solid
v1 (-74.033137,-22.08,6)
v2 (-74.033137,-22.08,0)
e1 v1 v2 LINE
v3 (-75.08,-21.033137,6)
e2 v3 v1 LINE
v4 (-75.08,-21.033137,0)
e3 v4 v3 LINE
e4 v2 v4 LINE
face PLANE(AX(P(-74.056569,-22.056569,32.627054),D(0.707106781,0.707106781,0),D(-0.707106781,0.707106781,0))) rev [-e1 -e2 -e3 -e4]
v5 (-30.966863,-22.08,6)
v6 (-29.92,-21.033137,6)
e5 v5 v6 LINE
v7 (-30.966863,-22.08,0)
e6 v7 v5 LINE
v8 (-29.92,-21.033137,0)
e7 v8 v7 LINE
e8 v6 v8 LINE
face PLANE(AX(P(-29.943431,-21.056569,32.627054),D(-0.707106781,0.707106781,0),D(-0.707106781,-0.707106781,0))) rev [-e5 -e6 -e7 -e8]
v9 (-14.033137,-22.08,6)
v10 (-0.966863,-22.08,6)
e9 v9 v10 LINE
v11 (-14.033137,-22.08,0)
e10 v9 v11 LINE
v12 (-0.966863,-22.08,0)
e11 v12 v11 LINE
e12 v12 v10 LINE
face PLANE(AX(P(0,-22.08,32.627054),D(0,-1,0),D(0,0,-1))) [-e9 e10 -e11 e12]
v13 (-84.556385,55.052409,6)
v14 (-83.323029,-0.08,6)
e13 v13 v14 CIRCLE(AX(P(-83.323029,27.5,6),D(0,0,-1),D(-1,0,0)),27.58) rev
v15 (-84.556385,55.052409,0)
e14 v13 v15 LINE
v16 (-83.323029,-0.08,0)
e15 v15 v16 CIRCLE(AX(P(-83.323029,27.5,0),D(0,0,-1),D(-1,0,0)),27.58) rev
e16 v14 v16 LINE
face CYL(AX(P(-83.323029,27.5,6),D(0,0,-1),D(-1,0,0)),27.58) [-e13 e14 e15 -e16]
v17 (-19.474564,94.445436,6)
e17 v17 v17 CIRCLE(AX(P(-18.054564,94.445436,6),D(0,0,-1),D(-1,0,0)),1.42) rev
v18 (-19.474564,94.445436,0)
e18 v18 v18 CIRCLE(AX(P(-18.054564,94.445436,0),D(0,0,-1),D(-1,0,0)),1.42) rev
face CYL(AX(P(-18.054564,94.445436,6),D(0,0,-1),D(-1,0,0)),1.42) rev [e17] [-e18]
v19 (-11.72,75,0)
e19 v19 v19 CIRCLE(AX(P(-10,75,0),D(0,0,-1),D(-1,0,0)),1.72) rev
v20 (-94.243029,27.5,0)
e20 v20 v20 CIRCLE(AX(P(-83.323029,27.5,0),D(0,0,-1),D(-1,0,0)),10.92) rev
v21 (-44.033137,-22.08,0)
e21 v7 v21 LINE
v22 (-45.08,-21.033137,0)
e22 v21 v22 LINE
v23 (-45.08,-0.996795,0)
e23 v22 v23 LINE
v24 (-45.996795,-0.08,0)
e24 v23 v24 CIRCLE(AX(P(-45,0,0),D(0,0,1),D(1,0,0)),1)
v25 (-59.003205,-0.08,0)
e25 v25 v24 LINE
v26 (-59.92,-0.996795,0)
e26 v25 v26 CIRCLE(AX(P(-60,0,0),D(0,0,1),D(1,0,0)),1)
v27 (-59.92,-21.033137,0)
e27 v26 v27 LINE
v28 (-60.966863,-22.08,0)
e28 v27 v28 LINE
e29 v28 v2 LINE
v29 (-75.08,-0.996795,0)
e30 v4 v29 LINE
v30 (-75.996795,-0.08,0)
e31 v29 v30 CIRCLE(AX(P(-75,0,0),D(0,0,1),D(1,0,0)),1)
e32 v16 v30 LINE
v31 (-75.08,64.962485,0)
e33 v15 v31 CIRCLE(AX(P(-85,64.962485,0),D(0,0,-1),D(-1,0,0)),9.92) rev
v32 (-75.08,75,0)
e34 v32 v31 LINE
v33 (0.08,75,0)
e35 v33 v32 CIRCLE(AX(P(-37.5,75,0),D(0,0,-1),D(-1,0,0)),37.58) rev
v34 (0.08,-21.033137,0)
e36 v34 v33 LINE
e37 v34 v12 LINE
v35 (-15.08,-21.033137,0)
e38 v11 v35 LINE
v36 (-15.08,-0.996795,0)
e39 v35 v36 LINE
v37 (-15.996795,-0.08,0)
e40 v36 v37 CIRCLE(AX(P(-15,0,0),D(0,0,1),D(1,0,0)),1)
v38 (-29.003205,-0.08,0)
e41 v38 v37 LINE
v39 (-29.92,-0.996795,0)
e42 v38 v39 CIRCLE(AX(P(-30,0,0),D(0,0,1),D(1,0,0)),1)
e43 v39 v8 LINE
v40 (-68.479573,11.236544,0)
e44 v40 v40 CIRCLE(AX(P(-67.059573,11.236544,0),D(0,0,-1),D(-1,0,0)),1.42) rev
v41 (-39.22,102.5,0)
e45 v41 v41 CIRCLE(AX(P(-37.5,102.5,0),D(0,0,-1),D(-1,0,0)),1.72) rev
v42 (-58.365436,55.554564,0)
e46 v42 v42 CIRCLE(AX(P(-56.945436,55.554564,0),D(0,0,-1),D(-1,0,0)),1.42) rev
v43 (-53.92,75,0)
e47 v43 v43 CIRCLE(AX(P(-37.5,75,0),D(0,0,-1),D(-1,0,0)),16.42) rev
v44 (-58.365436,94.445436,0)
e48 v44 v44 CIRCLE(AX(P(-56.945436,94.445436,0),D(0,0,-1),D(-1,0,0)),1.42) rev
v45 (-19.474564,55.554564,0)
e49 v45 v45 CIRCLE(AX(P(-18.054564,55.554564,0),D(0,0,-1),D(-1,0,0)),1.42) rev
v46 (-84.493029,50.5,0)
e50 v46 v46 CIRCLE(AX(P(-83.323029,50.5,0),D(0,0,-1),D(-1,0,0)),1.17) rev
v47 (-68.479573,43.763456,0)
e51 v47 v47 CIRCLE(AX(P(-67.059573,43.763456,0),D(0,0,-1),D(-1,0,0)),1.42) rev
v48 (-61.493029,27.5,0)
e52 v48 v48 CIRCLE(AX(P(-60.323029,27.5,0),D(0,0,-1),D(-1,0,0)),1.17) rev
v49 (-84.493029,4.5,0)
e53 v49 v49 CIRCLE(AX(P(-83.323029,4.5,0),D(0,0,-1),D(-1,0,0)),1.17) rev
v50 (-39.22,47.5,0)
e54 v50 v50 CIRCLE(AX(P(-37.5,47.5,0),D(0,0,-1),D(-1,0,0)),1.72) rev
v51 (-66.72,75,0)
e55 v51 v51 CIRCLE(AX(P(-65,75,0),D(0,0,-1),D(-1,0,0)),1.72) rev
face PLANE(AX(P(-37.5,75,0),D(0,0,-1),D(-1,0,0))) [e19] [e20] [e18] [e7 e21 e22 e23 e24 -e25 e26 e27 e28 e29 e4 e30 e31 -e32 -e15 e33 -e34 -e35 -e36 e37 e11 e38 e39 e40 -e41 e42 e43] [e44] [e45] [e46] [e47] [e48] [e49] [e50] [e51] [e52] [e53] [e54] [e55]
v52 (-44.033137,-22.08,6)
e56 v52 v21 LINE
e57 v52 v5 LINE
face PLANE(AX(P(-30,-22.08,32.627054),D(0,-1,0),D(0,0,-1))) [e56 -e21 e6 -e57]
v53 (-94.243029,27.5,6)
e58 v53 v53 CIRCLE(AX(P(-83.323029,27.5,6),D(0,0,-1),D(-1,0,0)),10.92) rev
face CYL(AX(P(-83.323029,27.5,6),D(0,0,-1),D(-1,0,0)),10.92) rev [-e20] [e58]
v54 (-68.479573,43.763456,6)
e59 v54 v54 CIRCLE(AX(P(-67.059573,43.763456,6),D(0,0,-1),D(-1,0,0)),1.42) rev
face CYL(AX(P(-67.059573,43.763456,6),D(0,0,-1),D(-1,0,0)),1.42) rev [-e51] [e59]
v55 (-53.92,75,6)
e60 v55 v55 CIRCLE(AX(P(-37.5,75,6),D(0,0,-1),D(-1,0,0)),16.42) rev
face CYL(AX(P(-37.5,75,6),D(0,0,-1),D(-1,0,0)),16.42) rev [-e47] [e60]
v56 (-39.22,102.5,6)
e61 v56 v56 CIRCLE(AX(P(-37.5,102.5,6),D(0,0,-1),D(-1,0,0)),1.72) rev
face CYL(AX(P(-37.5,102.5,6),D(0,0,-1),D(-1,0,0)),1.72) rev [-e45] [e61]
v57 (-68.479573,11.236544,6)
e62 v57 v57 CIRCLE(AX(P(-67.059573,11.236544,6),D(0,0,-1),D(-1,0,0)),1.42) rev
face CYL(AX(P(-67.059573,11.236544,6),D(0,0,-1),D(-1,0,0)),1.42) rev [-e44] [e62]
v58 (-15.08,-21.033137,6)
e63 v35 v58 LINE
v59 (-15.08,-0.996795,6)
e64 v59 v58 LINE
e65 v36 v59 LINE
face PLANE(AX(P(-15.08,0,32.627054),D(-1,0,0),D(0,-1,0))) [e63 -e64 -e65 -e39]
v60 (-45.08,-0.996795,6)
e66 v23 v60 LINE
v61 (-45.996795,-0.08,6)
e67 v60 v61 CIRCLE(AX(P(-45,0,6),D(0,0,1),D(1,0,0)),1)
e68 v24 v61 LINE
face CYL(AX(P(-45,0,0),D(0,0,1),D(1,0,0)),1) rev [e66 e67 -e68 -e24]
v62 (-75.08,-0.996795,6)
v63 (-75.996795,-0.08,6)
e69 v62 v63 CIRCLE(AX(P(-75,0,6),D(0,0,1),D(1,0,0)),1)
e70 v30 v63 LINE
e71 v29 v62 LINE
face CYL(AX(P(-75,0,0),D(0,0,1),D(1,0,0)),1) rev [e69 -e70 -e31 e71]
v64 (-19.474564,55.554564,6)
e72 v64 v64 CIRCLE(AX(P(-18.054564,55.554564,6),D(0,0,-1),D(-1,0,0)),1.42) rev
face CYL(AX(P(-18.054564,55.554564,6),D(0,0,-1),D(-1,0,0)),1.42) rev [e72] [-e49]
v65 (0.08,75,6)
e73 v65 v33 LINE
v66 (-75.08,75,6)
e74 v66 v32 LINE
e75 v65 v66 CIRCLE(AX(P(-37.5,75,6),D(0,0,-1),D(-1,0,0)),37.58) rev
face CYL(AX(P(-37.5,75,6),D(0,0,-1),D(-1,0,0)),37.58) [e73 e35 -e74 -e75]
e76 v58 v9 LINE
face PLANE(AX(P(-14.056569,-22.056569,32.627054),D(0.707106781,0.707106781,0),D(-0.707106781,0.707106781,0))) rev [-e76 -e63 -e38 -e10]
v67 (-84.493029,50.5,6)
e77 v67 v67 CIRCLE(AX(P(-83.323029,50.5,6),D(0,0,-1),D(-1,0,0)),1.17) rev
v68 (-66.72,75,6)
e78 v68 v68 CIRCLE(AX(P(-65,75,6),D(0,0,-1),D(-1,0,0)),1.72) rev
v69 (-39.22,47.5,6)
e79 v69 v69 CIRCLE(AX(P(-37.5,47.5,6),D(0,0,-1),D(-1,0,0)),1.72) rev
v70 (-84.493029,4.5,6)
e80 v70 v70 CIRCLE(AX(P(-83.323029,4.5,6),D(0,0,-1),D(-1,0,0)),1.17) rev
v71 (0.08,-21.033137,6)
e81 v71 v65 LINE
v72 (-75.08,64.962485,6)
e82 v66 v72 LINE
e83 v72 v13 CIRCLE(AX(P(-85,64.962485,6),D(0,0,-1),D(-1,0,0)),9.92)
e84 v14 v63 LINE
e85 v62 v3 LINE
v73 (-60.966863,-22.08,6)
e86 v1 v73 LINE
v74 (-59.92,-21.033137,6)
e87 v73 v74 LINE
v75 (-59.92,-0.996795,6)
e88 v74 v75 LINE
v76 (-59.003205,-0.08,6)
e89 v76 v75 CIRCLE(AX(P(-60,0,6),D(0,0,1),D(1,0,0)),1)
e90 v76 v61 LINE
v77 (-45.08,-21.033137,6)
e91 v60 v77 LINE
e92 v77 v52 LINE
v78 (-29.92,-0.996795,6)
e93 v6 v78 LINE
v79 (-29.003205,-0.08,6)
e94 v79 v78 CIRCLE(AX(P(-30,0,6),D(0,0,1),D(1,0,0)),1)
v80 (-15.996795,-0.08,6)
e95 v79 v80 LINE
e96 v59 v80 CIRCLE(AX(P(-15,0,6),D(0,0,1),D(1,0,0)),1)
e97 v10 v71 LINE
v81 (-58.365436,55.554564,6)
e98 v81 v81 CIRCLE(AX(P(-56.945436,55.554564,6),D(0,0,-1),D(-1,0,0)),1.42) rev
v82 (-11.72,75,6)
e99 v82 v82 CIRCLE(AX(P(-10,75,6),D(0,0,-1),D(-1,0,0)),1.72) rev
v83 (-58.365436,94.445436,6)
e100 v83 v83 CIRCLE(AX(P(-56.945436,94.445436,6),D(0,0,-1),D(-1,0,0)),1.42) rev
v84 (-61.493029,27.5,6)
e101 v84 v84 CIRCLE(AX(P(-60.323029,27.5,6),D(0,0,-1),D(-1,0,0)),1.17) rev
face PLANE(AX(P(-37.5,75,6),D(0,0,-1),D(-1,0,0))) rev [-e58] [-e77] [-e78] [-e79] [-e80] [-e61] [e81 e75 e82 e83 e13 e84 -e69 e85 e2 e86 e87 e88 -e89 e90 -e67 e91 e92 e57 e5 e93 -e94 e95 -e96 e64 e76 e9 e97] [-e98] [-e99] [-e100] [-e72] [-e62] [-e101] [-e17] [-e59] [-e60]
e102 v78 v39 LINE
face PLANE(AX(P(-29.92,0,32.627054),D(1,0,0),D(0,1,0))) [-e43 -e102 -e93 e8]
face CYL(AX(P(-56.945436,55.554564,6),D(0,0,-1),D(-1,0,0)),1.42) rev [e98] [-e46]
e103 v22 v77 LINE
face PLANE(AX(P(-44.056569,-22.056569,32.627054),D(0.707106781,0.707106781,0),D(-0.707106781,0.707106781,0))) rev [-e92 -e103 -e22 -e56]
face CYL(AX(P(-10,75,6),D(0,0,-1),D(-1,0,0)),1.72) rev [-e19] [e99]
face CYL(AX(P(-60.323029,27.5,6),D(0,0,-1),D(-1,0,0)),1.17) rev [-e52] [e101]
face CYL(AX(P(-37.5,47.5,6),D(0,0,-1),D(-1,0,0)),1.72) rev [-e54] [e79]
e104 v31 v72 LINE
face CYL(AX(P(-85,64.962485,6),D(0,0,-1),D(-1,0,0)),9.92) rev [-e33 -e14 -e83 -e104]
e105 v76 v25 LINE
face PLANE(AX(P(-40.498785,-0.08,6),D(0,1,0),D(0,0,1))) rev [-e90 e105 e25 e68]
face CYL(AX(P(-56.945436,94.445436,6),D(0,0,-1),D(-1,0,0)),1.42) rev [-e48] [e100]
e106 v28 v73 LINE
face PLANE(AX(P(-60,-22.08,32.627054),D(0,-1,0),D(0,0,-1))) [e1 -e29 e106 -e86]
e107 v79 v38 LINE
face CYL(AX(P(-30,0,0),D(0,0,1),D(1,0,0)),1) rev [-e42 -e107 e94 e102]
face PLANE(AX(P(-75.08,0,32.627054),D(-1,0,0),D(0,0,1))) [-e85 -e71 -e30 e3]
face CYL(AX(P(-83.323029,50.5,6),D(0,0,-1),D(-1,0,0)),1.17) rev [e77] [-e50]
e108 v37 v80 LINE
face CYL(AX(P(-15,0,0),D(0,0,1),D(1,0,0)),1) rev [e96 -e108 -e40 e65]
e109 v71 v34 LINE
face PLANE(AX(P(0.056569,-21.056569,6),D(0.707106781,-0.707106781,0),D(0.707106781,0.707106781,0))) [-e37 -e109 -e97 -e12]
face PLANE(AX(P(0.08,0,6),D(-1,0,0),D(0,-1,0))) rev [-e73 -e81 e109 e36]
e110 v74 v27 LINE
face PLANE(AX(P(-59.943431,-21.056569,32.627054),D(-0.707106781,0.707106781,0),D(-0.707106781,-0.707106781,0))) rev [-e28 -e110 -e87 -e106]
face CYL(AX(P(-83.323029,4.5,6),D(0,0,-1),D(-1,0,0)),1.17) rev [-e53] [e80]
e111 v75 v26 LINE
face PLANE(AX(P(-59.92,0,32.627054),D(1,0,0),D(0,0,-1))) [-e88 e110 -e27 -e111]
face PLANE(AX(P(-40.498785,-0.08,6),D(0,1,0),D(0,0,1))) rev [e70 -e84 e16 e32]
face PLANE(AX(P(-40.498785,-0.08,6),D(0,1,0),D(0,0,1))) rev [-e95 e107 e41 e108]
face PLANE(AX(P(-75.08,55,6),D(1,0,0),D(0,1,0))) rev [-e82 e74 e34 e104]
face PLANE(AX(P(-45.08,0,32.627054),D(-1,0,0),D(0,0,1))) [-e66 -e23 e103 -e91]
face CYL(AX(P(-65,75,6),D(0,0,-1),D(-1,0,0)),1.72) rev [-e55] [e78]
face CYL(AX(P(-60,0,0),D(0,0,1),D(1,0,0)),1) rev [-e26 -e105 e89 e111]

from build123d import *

# Parameters (mm, degrees)
SKETCH1_R               = 11
SKETCH1_R_2             = 16.5
SKETCH1_R_3             = 1.25
SKETCH1_R_4             = 1.5
SKETCH1_R_5             = 1.8
BOSS_EXTRUDE1_DEPTH     = 6
FILLET1_R               = 10
SKETCH2_W               = 15
SKETCH2_H               = 22
BOSS_EXTRUDE2_DEPTH     = 6
CHAMFER1_SIZE           = 1
SKETCH3_R               = 1
CUT_EXTRUDE1_DEPTH      = 159.031622895
MOVE_FACE1_OUTLINE_R    = 11
MOVE_FACE1_OUTLINE_R_2  = 10.92
MOVE_FACE1_OUTLINE_R_3  = 16.5
MOVE_FACE1_OUTLINE_R_4  = 16.42
MOVE_FACE1_OUTLINE_R_5  = 1.25
MOVE_FACE1_OUTLINE_R_6  = 1.17
MOVE_FACE1_OUTLINE_R_7  = 1.5
MOVE_FACE1_OUTLINE_R_8  = 1.42
MOVE_FACE1_OUTLINE_R_9  = 1.8
MOVE_FACE1_OUTLINE_R_10 = 1.72
MOVE_FACE1_DEPTH        = 6


# Read off the part's stored shape, not the designer's step: Move Face1
with BuildPart() as part:
    # Sketch1 → Boss-Extrude1 (new body)
    with BuildSketch(Plane.XY):
        with BuildLine():
            Line((-40.498784978, 0), (0, 0))
            Line((0, 0), (0, 75))
            ThreePointArc((0, 75), (-37.5, 112.5), (-75, 75))
            Line((-75, 75), (-75, 55))
            Line((-75, 55), (-83.323029145, 55))
            ThreePointArc((-83.323029145, 55), (-110.823029145, 27.5), (-83.323029145, 0))
            Line((-83.323029145, 0), (-40.498784978, 0))
        make_face()
        with Locations((-83.323029145, 27.5)):
            Circle(SKETCH1_R, mode=Mode.SUBTRACT)
        with Locations((-37.5, 75)):
            Circle(SKETCH1_R_2, mode=Mode.SUBTRACT)
        with Locations((-83.323029145, 50.5)):
            Circle(SKETCH1_R_3, mode=Mode.SUBTRACT)
        with Locations((-67.059573177, 43.763455967)):
            Circle(SKETCH1_R_4, mode=Mode.SUBTRACT)
        with Locations((-60.323029145, 27.5)):
            Circle(SKETCH1_R_3, mode=Mode.SUBTRACT)
        with Locations((-67.059573177, 11.236544033)):
            Circle(SKETCH1_R_4, mode=Mode.SUBTRACT)
        with Locations((-83.323029145, 4.5)):
            Circle(SKETCH1_R_3, mode=Mode.SUBTRACT)
        with Locations((-37.5, 102.5)):
            Circle(SKETCH1_R_5, mode=Mode.SUBTRACT)
        with Locations((-10, 75)):
            Circle(SKETCH1_R_5, mode=Mode.SUBTRACT)
        with Locations((-37.5, 47.5)):
            Circle(SKETCH1_R_5, mode=Mode.SUBTRACT)
        with Locations((-65, 75)):
            Circle(SKETCH1_R_5, mode=Mode.SUBTRACT)
        with Locations((-18.054563517, 94.445436483)):
            Circle(SKETCH1_R_4, mode=Mode.SUBTRACT)
        with Locations((-18.054563517, 55.554563517)):
            Circle(SKETCH1_R_4, mode=Mode.SUBTRACT)
        with Locations((-56.945436483, 55.554563517)):
            Circle(SKETCH1_R_4, mode=Mode.SUBTRACT)
        with Locations((-56.945436483, 94.445436483)):
            Circle(SKETCH1_R_4, mode=Mode.SUBTRACT)
    extrude(amount=BOSS_EXTRUDE1_DEPTH)

    # Fillet1
    fillet1_edges = [part.edges().sort_by_distance(p)[0] for p in [
        (-75, 55, 3),
    ]]
    fillet(fillet1_edges, radius=FILLET1_R)

    # Sketch2 → Boss-Extrude2 (add)
    with BuildSketch(Plane(origin=(0, 0, 0), x_dir=(-1, 0, 0), z_dir=(0, 0, -1))):
        with Locations((7.5, -11)):
            Rectangle(SKETCH2_W, SKETCH2_H)
        with Locations((37.5, -11)):
            Rectangle(SKETCH2_W, SKETCH2_H)
        with Locations((67.5, -11)):
            Rectangle(SKETCH2_W, SKETCH2_H)
    extrude(amount=-BOSS_EXTRUDE2_DEPTH)

    # Chamfer1
    chamfer1_edges = [part.edges().sort_by_distance(p)[0] for p in [
        (-30, -22, 3),
        (-45, -22, 3),
        (-60, -22, 3),
        (-75, -22, 3),
        (0, -22, 3),
        (-15, -22, 3),
    ]]
    chamfer(chamfer1_edges, length=CHAMFER1_SIZE)

    # Sketch3 → Cut-Extrude1 (cut, through all)
    with BuildSketch(Plane.XY.offset(6)):
        with Locations((-75, 0)):
            Circle(SKETCH3_R)
        with Locations((-60, 0)):
            Circle(SKETCH3_R)
        with Locations((-45, 0)):
            Circle(SKETCH3_R)
        with Locations((-30, 0)):
            Circle(SKETCH3_R)
        with Locations((-15, 0)):
            Circle(SKETCH3_R)
    extrude(amount=-CUT_EXTRUDE1_DEPTH, mode=Mode.SUBTRACT)

    # Move Face1 outline → Move Face1 (add)
    # profile 1 of 20: a face of its own
    with BuildSketch(Plane.XY):
        with BuildLine():
            Line((-59.003205136, -0.08), (-45.996794864, -0.08))
            ThreePointArc((-45.996794864, -0.08), (-45.999198395, -0.04003209), (-46, 0))
            Line((-46, 0), (-59, 0))
            ThreePointArc((-59, 0), (-59.000801605, -0.04003209), (-59.003205136, -0.08))
        make_face()
    # profile 2 of 20: a face of its own
    with BuildSketch(Plane.XY):
        with BuildLine():
            Line((-45, -21), (-45, -1))
            ThreePointArc((-45, -1), (-45.04003209, -0.999198395), (-45.08, -0.996794864))
            Line((-45.08, -0.996794864), (-45.08, -21.033137085))
            Line((-45.08, -21.033137085), (-44.033137085, -22.08))
            Line((-44.033137085, -22.08), (-30.966862915, -22.08))
            Line((-30.966862915, -22.08), (-29.92, -21.033137085))
            Line((-29.92, -21.033137085), (-29.92, -0.996794864))
            ThreePointArc((-29.92, -0.996794864), (-29.95996791, -0.999198395), (-30, -1))
            Line((-30, -1), (-30, -21))
            Line((-30, -21), (-31, -22))
            Line((-31, -22), (-44, -22))
            Line((-44, -22), (-45, -21))
        make_face()
    # profile 3 of 20: a face of its own
    with BuildSketch(Plane.XY):
        with BuildLine():
            ThreePointArc((-59.92, -0.996794864), (-59.95996791, -0.999198395), (-60, -1))
            Line((-60, -1), (-60, -21))
            Line((-60, -21), (-61, -22))
            Line((-61, -22), (-74, -22))
            Line((-74, -22), (-75, -21))
            Line((-75, -21), (-75, -1))
            ThreePointArc((-75, -1), (-75.04003209, -0.999198395), (-75.08, -0.996794864))
            Line((-75.08, -0.996794864), (-75.08, -21.033137085))
            Line((-75.08, -21.033137085), (-74.033137085, -22.08))
            Line((-74.033137085, -22.08), (-60.966862915, -22.08))
            Line((-60.966862915, -22.08), (-59.92, -21.033137085))
            Line((-59.92, -21.033137085), (-59.92, -0.996794864))
        make_face()
    # profile 4 of 20: a face of its own
    with BuildSketch(Plane.XY):
        with BuildLine():
            Line((-16, 0), (-29, 0))
            ThreePointArc((-29, 0), (-29.000801605, -0.04003209), (-29.003205136, -0.08))
            Line((-29.003205136, -0.08), (-15.996794864, -0.08))
            ThreePointArc((-15.996794864, -0.08), (-15.999198395, -0.04003209), (-16, 0))
        make_face()
    # profile 5 of 20: a face of its own
    with BuildSketch(Plane.XY):
        with BuildLine():
            ThreePointArc((-75.996794864, -0.08), (-75.999198395, -0.04003209), (-76, 0))
            Line((-76, 0), (-83.323029145, 0))
            ThreePointArc((-83.323029145, 0), (-110.816150501, 26.884956844), (-84.552807772, 54.972488867))
            ThreePointArc((-84.552807772, 54.972488867), (-77.772555006, 58.051331596), (-75, 64.962484818))
            Line((-75, 64.962484818), (-75, 75))
            ThreePointArc((-75, 75), (-37.5, 112.5), (0, 75))
            Line((0, 75), (0, -21))
            Line((0, -21), (-1, -22))
            Line((-1, -22), (-14, -22))
            Line((-14, -22), (-15, -21))
            Line((-15, -21), (-15, -1))
            ThreePointArc((-15, -1), (-15.04003209, -0.999198395), (-15.08, -0.996794864))
            Line((-15.08, -0.996794864), (-15.08, -21.033137085))
            Line((-15.08, -21.033137085), (-14.033137085, -22.08))
            Line((-14.033137085, -22.08), (-0.966862915, -22.08))
            Line((-0.966862915, -22.08), (0.08, -21.033137085))
            Line((0.08, -21.033137085), (0.08, 75))
            ThreePointArc((0.08, 75), (-37.5, 112.58), (-75.08, 75))
            Line((-75.08, 75), (-75.08, 64.962484818))
            ThreePointArc((-75.08, 64.962484818), (-77.830374566, 58.106620822), (-84.55638531, 55.052408834))
            ThreePointArc((-84.55638531, 55.052408834), (-110.896130491, 26.883167628), (-83.323029145, -0.08))
            Line((-83.323029145, -0.08), (-75.996794864, -0.08))
        make_face()
    # profile 6 of 20: a face of its own
    with BuildSketch(Plane.XY):
        with Locations((-83.323029145, 27.5)):
            Circle(MOVE_FACE1_OUTLINE_R)
        with Locations((-83.323029145, 27.5)):
            Circle(MOVE_FACE1_OUTLINE_R_2, mode=Mode.SUBTRACT)
    # profile 7 of 20: a face of its own
    with BuildSketch(Plane.XY):
        with Locations((-37.5, 75)):
            Circle(MOVE_FACE1_OUTLINE_R_3)
        with Locations((-37.5, 75)):
            Circle(MOVE_FACE1_OUTLINE_R_4, mode=Mode.SUBTRACT)
    # profile 8 of 20: a face of its own
    with BuildSketch(Plane.XY):
        with Locations((-83.323029145, 50.5)):
            Circle(MOVE_FACE1_OUTLINE_R_5)
        with Locations((-83.323029145, 50.5)):
            Circle(MOVE_FACE1_OUTLINE_R_6, mode=Mode.SUBTRACT)
    # profile 9 of 20: a face of its own
    with BuildSketch(Plane.XY):
        with Locations((-67.059573177, 43.763455967)):
            Circle(MOVE_FACE1_OUTLINE_R_7)
        with Locations((-67.059573177, 43.763455967)):
            Circle(MOVE_FACE1_OUTLINE_R_8, mode=Mode.SUBTRACT)
    # profile 10 of 20: a face of its own
    with BuildSketch(Plane.XY):
        with Locations((-37.5, 102.5)):
            Circle(MOVE_FACE1_OUTLINE_R_9)
        with Locations((-37.5, 102.5)):
            Circle(MOVE_FACE1_OUTLINE_R_10, mode=Mode.SUBTRACT)
    # profile 11 of 20: a face of its own
    with BuildSketch(Plane.XY):
        with Locations((-60.323029145, 27.5)):
            Circle(MOVE_FACE1_OUTLINE_R_5)
        with Locations((-60.323029145, 27.5)):
            Circle(MOVE_FACE1_OUTLINE_R_6, mode=Mode.SUBTRACT)
    # profile 12 of 20: a face of its own
    with BuildSketch(Plane.XY):
        with Locations((-67.059573177, 11.236544033)):
            Circle(MOVE_FACE1_OUTLINE_R_7)
        with Locations((-67.059573177, 11.236544033)):
            Circle(MOVE_FACE1_OUTLINE_R_8, mode=Mode.SUBTRACT)
    # profile 13 of 20: a face of its own
    with BuildSketch(Plane.XY):
        with Locations((-83.323029145, 4.5)):
            Circle(MOVE_FACE1_OUTLINE_R_5)
        with Locations((-83.323029145, 4.5)):
            Circle(MOVE_FACE1_OUTLINE_R_6, mode=Mode.SUBTRACT)
    # profile 14 of 20: a face of its own
    with BuildSketch(Plane.XY):
        with Locations((-10, 75)):
            Circle(MOVE_FACE1_OUTLINE_R_9)
        with Locations((-10, 75)):
            Circle(MOVE_FACE1_OUTLINE_R_10, mode=Mode.SUBTRACT)
    # profile 15 of 20: a face of its own
    with BuildSketch(Plane.XY):
        with Locations((-37.5, 47.5)):
            Circle(MOVE_FACE1_OUTLINE_R_9)
        with Locations((-37.5, 47.5)):
            Circle(MOVE_FACE1_OUTLINE_R_10, mode=Mode.SUBTRACT)
    # profile 16 of 20: a face of its own
    with BuildSketch(Plane.XY):
        with Locations((-65, 75)):
            Circle(MOVE_FACE1_OUTLINE_R_9)
        with Locations((-65, 75)):
            Circle(MOVE_FACE1_OUTLINE_R_10, mode=Mode.SUBTRACT)
    # profile 17 of 20: a face of its own
    with BuildSketch(Plane.XY):
        with Locations((-18.054563517, 94.445436483)):
            Circle(MOVE_FACE1_OUTLINE_R_7)
        with Locations((-18.054563517, 94.445436483)):
            Circle(MOVE_FACE1_OUTLINE_R_8, mode=Mode.SUBTRACT)
    # profile 18 of 20: a face of its own
    with BuildSketch(Plane.XY):
        with Locations((-18.054563517, 55.554563517)):
            Circle(MOVE_FACE1_OUTLINE_R_7)
        with Locations((-18.054563517, 55.554563517)):
            Circle(MOVE_FACE1_OUTLINE_R_8, mode=Mode.SUBTRACT)
    # profile 19 of 20: a face of its own
    with BuildSketch(Plane.XY):
        with Locations((-56.945436483, 55.554563517)):
            Circle(MOVE_FACE1_OUTLINE_R_7)
        with Locations((-56.945436483, 55.554563517)):
            Circle(MOVE_FACE1_OUTLINE_R_8, mode=Mode.SUBTRACT)
    # profile 20 of 20: a face of its own
    with BuildSketch(Plane.XY):
        with Locations((-56.945436483, 94.445436483)):
            Circle(MOVE_FACE1_OUTLINE_R_7)
        with Locations((-56.945436483, 94.445436483)):
            Circle(MOVE_FACE1_OUTLINE_R_8, mode=Mode.SUBTRACT)
    extrude(amount=MOVE_FACE1_DEPTH)


solid = part.part
